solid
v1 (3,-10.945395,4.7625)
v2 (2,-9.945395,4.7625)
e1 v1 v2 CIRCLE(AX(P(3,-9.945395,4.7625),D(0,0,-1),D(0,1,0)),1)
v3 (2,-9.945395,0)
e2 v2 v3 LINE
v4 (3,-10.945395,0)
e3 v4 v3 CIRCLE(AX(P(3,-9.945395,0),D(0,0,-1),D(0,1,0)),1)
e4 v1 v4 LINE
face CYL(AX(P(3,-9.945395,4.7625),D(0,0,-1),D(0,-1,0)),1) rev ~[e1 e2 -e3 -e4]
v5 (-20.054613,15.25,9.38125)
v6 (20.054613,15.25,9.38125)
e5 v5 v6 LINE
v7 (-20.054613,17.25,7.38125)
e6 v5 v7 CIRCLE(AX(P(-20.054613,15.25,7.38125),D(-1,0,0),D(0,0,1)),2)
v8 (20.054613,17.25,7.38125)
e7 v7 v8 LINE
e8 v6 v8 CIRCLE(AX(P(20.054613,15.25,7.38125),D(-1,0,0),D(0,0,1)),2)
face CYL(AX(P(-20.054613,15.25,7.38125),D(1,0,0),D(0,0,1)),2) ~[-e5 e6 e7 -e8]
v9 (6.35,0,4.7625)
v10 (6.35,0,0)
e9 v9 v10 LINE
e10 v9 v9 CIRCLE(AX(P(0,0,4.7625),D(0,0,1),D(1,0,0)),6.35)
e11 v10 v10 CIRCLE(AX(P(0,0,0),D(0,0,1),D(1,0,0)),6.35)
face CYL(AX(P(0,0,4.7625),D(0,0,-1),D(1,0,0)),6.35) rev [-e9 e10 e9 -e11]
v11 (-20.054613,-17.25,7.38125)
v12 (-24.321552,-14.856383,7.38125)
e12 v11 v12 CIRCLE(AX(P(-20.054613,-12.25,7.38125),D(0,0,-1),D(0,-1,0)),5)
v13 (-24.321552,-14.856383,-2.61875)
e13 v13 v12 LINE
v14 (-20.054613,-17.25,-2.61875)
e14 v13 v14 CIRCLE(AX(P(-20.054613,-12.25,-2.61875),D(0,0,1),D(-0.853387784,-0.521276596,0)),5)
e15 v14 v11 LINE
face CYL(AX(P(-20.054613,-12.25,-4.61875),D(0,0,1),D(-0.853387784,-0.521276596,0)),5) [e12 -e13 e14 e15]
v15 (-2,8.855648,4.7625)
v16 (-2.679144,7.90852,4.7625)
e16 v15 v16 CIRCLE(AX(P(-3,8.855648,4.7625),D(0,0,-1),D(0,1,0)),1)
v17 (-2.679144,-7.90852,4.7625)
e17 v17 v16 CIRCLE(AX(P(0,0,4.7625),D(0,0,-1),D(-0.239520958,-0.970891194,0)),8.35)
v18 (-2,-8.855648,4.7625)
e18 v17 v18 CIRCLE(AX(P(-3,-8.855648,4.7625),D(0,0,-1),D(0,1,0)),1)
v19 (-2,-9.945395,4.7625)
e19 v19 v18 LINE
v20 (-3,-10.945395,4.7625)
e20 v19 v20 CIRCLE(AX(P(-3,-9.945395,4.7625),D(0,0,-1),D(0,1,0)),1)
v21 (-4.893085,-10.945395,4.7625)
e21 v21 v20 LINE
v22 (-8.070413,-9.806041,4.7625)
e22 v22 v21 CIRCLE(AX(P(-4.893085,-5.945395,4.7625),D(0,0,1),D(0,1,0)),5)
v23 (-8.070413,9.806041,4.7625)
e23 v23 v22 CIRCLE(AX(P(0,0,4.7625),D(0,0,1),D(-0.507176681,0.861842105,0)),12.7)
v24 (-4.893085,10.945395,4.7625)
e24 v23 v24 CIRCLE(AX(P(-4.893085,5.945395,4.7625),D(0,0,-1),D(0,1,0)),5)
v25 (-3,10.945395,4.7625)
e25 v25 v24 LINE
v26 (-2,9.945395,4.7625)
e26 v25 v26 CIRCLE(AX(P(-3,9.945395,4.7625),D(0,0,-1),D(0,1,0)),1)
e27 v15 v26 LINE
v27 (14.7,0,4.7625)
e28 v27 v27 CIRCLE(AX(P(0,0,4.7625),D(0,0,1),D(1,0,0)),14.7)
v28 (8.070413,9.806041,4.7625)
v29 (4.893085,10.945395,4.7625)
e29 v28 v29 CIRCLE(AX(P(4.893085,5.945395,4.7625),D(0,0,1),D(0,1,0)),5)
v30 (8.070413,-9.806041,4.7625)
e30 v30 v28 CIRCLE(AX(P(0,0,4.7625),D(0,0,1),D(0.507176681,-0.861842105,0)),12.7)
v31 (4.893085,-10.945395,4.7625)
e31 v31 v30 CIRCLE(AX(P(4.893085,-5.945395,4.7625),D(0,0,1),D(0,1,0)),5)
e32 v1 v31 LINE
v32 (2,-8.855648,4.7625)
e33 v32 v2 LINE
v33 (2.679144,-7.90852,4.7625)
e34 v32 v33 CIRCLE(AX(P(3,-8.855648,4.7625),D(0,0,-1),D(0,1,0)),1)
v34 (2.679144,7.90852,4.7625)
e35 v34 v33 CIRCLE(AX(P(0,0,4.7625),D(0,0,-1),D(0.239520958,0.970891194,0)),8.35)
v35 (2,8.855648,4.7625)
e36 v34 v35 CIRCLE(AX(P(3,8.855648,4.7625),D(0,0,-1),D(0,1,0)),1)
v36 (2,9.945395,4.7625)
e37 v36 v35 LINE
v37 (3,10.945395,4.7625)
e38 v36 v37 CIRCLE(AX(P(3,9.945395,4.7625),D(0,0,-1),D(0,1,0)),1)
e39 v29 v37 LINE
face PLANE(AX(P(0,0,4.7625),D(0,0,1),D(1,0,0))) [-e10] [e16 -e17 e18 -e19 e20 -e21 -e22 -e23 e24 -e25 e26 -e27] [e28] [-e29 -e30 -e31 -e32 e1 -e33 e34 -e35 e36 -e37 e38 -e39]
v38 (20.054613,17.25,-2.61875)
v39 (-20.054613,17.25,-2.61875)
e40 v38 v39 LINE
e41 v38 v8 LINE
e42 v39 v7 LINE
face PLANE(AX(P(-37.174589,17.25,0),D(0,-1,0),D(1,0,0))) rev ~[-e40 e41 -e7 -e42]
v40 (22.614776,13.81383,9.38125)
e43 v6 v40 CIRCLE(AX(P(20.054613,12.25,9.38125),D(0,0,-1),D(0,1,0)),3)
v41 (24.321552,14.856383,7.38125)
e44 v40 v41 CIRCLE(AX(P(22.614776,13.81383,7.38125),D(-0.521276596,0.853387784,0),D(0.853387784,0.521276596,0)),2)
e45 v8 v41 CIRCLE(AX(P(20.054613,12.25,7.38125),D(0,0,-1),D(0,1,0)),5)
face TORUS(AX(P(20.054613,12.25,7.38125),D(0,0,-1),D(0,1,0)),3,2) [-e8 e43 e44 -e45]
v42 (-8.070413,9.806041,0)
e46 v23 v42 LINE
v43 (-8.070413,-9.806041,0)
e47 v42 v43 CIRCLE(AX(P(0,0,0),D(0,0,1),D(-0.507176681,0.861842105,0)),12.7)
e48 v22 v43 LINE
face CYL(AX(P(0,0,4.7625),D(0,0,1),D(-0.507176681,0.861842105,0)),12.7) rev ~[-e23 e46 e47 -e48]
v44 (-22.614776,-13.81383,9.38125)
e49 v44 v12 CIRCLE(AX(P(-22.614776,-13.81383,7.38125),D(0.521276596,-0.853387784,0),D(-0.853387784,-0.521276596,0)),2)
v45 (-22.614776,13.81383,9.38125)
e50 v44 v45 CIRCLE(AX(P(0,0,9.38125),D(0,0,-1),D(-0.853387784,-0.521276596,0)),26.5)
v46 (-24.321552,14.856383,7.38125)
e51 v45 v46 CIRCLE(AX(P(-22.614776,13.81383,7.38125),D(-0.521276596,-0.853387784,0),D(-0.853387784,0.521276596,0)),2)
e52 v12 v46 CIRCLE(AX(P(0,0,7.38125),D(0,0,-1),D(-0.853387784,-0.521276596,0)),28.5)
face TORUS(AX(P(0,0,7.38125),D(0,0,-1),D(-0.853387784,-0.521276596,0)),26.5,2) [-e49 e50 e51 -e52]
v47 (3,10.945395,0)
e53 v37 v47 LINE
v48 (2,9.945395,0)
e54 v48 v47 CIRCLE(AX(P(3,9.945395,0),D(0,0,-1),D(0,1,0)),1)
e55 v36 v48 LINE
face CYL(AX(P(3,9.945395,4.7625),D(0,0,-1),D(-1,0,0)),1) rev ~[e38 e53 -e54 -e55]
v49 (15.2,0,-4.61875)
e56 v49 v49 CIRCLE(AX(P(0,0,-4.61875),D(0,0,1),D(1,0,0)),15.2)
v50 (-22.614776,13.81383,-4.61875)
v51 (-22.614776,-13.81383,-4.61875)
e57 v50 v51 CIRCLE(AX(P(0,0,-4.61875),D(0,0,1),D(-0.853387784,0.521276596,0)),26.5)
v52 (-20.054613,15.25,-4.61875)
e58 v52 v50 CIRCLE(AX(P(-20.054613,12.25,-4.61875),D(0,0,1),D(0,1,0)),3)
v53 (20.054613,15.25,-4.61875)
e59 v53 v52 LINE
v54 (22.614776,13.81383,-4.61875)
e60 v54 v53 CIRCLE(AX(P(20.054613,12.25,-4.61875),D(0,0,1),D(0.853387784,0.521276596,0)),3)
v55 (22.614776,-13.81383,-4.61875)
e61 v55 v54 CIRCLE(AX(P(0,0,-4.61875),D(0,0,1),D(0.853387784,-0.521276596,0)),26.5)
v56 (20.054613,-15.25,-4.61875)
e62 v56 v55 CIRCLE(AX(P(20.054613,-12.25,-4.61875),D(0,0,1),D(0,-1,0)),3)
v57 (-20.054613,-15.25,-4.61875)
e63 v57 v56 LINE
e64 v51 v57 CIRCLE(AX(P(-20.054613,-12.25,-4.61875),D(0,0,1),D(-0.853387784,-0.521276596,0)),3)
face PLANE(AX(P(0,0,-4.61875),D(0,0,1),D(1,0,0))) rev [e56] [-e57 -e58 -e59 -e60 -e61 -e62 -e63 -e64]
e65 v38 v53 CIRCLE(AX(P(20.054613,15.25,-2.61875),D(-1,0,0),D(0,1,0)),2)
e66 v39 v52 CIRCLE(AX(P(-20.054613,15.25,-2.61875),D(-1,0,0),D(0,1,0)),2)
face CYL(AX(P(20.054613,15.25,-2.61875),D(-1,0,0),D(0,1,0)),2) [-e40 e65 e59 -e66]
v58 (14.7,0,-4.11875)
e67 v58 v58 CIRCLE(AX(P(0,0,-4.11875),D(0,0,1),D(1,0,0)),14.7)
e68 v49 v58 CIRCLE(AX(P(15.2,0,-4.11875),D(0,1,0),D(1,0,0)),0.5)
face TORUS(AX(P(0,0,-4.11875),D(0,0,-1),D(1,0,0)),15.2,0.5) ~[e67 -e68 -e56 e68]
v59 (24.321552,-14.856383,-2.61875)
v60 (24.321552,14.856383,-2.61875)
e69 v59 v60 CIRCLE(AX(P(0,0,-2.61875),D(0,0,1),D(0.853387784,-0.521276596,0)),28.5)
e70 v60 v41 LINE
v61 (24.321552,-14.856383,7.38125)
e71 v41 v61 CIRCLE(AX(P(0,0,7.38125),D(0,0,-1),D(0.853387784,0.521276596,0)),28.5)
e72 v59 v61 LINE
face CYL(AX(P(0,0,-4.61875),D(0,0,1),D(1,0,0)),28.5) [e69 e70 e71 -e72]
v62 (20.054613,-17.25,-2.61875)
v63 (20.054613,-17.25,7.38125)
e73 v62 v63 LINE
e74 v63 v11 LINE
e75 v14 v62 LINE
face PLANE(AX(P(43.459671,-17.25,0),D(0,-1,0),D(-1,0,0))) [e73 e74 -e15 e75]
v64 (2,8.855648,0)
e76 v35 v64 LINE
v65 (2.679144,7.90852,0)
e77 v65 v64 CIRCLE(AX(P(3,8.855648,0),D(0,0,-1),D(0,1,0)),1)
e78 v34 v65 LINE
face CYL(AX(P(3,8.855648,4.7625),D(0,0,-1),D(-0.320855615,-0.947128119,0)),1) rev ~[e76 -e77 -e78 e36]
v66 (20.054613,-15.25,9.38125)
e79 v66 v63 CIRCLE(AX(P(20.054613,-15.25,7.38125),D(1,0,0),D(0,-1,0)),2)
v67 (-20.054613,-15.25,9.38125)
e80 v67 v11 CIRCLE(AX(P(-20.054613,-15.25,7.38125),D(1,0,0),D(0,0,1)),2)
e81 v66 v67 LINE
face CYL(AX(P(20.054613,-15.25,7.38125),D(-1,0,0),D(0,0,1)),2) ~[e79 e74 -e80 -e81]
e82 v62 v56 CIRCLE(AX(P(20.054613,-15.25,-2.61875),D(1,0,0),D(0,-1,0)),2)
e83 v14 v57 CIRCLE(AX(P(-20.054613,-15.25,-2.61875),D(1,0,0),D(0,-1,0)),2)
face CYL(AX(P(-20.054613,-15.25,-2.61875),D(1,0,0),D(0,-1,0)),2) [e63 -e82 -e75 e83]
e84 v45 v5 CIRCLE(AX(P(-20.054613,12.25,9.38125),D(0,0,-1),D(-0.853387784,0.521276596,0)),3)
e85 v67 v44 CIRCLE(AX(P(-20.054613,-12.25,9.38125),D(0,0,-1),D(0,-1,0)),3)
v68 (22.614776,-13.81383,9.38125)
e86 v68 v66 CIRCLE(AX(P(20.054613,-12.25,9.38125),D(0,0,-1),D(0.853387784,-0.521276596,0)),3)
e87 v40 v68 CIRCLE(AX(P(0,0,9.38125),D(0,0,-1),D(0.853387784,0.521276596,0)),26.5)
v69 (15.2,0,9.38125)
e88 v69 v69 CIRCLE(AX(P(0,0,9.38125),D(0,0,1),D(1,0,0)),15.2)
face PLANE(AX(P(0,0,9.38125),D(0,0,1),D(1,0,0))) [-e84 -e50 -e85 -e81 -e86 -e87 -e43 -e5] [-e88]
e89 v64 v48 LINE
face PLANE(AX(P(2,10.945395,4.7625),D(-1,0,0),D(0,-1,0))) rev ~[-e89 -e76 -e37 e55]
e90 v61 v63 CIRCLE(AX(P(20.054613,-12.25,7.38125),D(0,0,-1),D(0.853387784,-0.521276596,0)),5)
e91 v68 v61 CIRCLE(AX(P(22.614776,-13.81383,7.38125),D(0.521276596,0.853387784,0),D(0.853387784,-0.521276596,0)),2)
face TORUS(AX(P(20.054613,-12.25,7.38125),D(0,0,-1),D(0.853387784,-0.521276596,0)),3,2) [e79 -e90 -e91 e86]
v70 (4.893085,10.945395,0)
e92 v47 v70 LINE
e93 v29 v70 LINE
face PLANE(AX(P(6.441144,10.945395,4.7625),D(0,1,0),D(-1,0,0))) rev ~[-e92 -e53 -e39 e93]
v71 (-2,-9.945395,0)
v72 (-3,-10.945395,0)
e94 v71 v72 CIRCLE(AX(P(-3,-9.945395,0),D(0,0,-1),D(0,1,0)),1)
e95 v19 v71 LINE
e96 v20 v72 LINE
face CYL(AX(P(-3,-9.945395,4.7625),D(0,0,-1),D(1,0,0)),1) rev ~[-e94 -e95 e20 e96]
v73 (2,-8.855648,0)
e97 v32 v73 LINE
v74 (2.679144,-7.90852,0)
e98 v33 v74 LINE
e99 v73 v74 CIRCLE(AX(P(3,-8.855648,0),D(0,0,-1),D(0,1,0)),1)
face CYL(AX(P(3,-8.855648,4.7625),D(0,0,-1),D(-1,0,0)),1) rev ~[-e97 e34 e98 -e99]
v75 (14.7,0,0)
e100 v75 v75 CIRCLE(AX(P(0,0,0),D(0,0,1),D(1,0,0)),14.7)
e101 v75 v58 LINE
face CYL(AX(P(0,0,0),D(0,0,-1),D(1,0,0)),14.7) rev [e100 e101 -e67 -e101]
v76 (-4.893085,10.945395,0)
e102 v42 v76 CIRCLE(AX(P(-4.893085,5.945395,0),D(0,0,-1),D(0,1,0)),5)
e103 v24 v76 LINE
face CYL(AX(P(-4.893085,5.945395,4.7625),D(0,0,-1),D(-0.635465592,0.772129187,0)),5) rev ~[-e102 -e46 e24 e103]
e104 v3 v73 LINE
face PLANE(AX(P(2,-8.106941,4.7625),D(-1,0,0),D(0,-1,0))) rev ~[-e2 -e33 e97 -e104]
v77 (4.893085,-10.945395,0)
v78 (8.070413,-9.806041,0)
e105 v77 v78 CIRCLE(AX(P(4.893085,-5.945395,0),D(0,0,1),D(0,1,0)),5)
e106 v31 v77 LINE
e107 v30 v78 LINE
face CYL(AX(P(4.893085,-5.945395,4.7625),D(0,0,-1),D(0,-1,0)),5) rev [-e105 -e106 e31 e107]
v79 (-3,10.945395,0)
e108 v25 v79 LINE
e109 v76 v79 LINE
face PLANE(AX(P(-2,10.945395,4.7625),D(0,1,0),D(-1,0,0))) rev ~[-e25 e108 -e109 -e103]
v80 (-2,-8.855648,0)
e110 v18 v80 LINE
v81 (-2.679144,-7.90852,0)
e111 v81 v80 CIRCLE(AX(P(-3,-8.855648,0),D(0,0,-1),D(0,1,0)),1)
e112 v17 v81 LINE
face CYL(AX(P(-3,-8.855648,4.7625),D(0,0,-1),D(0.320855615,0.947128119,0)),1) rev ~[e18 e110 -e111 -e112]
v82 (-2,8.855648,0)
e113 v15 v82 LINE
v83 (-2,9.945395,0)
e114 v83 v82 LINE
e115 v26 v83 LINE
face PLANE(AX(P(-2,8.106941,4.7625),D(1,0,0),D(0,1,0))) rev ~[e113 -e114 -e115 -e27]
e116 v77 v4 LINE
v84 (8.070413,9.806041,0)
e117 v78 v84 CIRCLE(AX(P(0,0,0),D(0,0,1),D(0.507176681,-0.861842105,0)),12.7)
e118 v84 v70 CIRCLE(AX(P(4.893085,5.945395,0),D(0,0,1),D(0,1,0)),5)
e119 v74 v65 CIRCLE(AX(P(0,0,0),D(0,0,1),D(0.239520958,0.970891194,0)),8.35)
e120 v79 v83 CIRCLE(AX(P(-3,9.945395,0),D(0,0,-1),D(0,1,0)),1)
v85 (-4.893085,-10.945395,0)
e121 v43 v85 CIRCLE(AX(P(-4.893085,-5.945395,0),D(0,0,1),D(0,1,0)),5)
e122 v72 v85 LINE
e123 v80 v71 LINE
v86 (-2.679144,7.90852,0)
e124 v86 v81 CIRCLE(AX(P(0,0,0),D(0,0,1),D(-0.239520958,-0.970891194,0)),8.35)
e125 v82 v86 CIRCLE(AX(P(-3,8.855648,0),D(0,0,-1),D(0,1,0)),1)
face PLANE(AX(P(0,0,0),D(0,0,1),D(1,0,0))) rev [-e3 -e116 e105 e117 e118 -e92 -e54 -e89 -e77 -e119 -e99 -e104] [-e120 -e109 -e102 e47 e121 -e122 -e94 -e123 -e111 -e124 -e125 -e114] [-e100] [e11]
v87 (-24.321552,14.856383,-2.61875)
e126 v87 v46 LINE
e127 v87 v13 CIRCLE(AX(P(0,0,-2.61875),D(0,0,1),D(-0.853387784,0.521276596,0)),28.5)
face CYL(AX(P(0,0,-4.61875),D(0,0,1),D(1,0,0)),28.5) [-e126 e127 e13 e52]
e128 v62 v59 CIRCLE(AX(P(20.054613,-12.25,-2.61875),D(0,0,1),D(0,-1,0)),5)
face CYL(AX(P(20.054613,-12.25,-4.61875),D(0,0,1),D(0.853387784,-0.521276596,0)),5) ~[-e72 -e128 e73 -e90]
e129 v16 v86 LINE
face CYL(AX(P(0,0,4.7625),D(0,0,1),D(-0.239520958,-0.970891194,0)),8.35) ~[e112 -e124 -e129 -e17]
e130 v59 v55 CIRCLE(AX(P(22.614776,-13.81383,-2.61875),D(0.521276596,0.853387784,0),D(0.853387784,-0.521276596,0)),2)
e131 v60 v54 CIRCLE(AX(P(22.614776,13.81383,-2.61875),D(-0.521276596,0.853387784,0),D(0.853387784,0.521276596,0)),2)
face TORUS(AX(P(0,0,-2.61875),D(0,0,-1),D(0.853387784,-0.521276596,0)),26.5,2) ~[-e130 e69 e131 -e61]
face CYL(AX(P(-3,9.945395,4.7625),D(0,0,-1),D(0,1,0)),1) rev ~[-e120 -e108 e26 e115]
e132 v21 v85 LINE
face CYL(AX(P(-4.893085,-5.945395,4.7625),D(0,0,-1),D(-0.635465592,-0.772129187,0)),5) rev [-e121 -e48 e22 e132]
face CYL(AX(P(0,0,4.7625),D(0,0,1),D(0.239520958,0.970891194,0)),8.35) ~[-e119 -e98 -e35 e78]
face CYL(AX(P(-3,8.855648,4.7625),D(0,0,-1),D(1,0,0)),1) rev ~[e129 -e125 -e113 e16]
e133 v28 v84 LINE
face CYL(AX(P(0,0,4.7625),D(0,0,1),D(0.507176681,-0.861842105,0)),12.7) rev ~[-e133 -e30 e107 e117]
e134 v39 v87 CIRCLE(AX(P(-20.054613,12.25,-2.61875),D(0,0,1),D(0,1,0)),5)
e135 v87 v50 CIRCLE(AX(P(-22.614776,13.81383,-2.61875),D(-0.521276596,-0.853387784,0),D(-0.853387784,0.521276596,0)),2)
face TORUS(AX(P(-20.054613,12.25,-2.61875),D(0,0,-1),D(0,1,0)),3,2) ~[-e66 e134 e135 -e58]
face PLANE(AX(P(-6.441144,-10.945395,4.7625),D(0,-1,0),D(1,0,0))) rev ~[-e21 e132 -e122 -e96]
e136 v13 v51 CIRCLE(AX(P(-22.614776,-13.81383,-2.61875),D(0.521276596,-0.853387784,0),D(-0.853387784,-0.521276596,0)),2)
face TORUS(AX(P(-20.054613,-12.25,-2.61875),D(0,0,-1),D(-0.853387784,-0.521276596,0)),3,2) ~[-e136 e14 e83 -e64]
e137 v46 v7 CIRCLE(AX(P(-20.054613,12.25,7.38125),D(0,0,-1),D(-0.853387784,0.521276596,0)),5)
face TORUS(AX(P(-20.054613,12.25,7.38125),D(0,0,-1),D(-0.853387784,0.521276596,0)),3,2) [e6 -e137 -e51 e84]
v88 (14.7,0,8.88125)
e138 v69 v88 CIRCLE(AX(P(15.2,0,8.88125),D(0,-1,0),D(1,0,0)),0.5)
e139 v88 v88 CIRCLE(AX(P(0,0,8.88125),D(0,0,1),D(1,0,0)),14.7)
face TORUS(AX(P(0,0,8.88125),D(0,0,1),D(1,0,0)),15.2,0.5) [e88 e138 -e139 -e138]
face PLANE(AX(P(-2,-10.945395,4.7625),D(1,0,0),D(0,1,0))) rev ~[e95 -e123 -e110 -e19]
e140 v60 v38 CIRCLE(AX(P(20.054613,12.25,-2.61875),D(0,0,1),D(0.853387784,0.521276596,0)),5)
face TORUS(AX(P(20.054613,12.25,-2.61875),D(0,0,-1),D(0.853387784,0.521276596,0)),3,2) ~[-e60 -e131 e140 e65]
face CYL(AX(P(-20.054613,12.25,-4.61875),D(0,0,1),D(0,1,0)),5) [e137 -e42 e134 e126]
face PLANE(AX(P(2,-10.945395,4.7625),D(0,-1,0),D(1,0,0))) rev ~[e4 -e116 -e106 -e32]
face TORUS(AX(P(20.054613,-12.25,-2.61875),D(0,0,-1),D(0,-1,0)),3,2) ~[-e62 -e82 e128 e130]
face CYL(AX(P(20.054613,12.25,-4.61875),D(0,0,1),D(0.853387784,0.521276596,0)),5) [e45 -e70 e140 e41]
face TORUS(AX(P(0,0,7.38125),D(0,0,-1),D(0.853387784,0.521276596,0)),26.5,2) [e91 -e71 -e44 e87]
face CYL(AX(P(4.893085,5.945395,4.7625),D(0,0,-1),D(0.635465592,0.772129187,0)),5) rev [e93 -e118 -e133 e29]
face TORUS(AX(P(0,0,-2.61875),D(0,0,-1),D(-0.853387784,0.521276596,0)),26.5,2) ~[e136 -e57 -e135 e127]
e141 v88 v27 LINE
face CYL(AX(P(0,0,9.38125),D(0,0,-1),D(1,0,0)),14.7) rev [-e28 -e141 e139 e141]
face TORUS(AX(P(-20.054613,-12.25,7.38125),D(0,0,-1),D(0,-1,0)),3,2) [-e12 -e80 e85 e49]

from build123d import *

# Parameters (mm, degrees)
F3_DEPTH      = 12.5
F5_DEPTH      = 25
F6_R          = 5
F6_2_R        = 5
F7_F1_R       = 1
F7_F2_R       = 1
F7_F3_R       = 1
F7_F4_R       = 1
F7_F5_R       = 1
F7_F6_R       = 1
F7_F7_R       = 1
F7_F8_R       = 1
F7_2_T1_DEPTH = 4.7461491674
F7_2_T3_DEPTH = 6.508829184
F8_R          = 5
F9_R          = 2
F10_R         = 1
F11_R         = 0.5
F12_R         = 0.99999
F13_R         = 0.5


# Not quite as in the source:
# - a fillet or chamfer that OpenCascade refuses, or shapes differently, is made with other operations: its cross-section is extruded or revolved along the edge and cut away or added
# - a fillet or chamfer is up to 0.001 mm smaller than in the source, because OpenCascade refuses the exact size


with BuildPart() as f1:
    # F0 (on Front) → F1 (revolve)
    with BuildSketch(Plane.XZ):
        Polygon((6.35, 4.7625), (6.35, 0), (12.7, 0), (14.7, 0), (14.7, -1.5), (14.7, -4.61875), (24.5, -4.61875), (28.5, -4.61875), (28.5, 2.38125), (28.5, 9.38125), (24.5, 9.38125), (14.7, 9.38125), (14.7, 6.2625), (14.7, 4.7625), (12.7, 4.7625), align=None)
    revolve(axis=Axis((0, 0, 2.38125), (0, 0, 1)))

    # F2 (on Top) → F3 (cut, symmetric)
    with BuildSketch(Plane.XY):
        Polygon((43.4596711934, -17.25), (17.25, -17.25), (-17.25, -17.25), (-37.0058989125, -17.25), (-37.0058989125, -42.7323755096), (43.4596711934, -42.7323755096), align=None)
        Polygon((-17.25, 17.25), (17.25, 17.25), (41.6040706777, 17.25), (41.6040706777, 42.1191624585), (-37.1745894389, 42.1191624585), (-37.1745894389, 17.25), align=None)
    extrude(amount=F3_DEPTH, both=True, mode=Mode.SUBTRACT)


with BuildPart() as f1b:
    # F0 (on Front) → F1, piece 2 (revolve)
    with BuildSketch(Plane.XZ):
        with BuildLine():
            Line((13.7, -0.7476008326), (12.7, -0.7476008326))
            Line((12.7, -0.7476008326), (0, -0.7476008326))
            Line((0, -0.7476008326), (0, -3.9319758326))
            ThreePointArc((0, -3.9319758326), (4.3942490964, -4.3344919718), (8.6518969432, -5.49375))
            Line((8.6518969432, -5.49375), (10.5085438117, -5.49375))
            Line((10.5085438117, -5.49375), (13.7, -5.49375))
            Line((13.7, -5.49375), (13.7, -1.5))
            Line((13.7, -1.5), (13.7, -0.7476008326))
        make_face()
    revolve(axis=Axis((0, 0, 2.38125), (0, 0, 1)))


with BuildPart() as f1c:
    # F0 (on Front) → F1, piece 3 (revolve)
    with BuildSketch(Plane.XZ):
        with BuildLine():
            Line((0, 8.6944758326), (0, 6.2577016652))
            Line((0, 6.2577016652), (0, 5.5101008326))
            Line((0, 5.5101008326), (12.7, 5.5101008326))
            Line((12.7, 5.5101008326), (13.7, 5.5101008326))
            Line((13.7, 5.5101008326), (13.7, 6.2625))
            Line((13.7, 6.2625), (13.7, 10.25625))
            Line((13.7, 10.25625), (10.5085438117, 10.25625))
            Line((10.5085438117, 10.25625), (8.6518969432, 10.25625))
            ThreePointArc((8.6518969432, 10.25625), (4.3942490964, 9.0969919718), (0, 8.6944758326))
        make_face()
    revolve(axis=Axis((0, 0, 2.38125), (0, 0, 1)))

    # F10
    f10_edges = [f1c.edges().sort_by_distance(p)[0] for p in [
        (-13.7, 0, 10.25625),
    ]]
    fillet(f10_edges, radius=F10_R)


with BuildPart() as f5_tool:
    # F4 (on face) → F5 (new body)
    with BuildSketch(Plane.XY.offset(4.7625)):
        with BuildLine():
            ThreePointArc((-6.4411438468, 10.9453947368), (-12.7, 0), (-6.4411438468, -10.9453947368))
            Line((-6.4411438468, -10.9453947368), (-2, -10.9453947368))
            Line((-2, -10.9453947368), (-2, -8.1069414701))
            ThreePointArc((-2, -8.1069414701), (-8.35, 0), (-2, 8.1069414701))
            Line((-2, 8.1069414701), (-2, 10.9453947368))
            Line((-2, 10.9453947368), (-6.4411438468, 10.9453947368))
        make_face()
        with BuildLine():
            Line((2, -10.9453947368), (6.4411438468, -10.9453947368))
            ThreePointArc((6.4411438468, -10.9453947368), (12.7, 0), (6.4411438468, 10.9453947368))
            Line((6.4411438468, 10.9453947368), (2, 10.9453947368))
            Line((2, 10.9453947368), (2, 8.1069414701))
            ThreePointArc((2, 8.1069414701), (8.35, 0), (2, -8.1069414701))
            Line((2, -8.1069414701), (2, -10.9453947368))
        make_face()
    extrude(amount=-F5_DEPTH)


with BuildPart() as f1_1:
    add(f1.part)

    # F5: cut by f5_tool
    add(f5_tool.part, mode=Mode.SUBTRACT)

    # F6
    f6_edges = [f1_1.edges().sort_by_distance(p)[0] for p in [
        (6.441144, 10.945395, 2.38125),
        (-6.441144, 10.945395, 2.38125),
        (-6.441144, -10.945395, 2.38125),
        (6.441144, -10.945395, 2.38125),
    ]]
    fillet(f6_edges, radius=F6_R)

    # F7: fillet of radius 1 on 8 edges, made by hand

    # F7_f1
    f7_f1_edges = [f1_1.edges().sort_by_distance(p)[0] for p in [
        (-2, 10.9453947368, 2.38125),
    ]]
    fillet(f7_f1_edges, radius=F7_F1_R)

    # F7_f2
    f7_f2_edges = [f1_1.edges().sort_by_distance(p)[0] for p in [
        (-2, 8.1069414701, 2.38125),
    ]]
    fillet(f7_f2_edges, radius=F7_F2_R)

    # F7_f3
    f7_f3_edges = [f1_1.edges().sort_by_distance(p)[0] for p in [
        (-2, -8.1069414701, 2.38125),
    ]]
    fillet(f7_f3_edges, radius=F7_F3_R)

    # F7_f4
    f7_f4_edges = [f1_1.edges().sort_by_distance(p)[0] for p in [
        (-2, -10.9453947368, 2.38125),
    ]]
    fillet(f7_f4_edges, radius=F7_F4_R)

    # F7_f5
    f7_f5_edges = [f1_1.edges().sort_by_distance(p)[0] for p in [
        (2, -10.9453947368, 2.38125),
    ]]
    fillet(f7_f5_edges, radius=F7_F5_R)

    # F7_f6
    f7_f6_edges = [f1_1.edges().sort_by_distance(p)[0] for p in [
        (2, -8.1069414701, 2.38125),
    ]]
    fillet(f7_f6_edges, radius=F7_F6_R)

    # F7_f7
    f7_f7_edges = [f1_1.edges().sort_by_distance(p)[0] for p in [
        (2, 8.1069414701, 2.38125),
    ]]
    fillet(f7_f7_edges, radius=F7_F7_R)

    # F7_f8
    f7_f8_edges = [f1_1.edges().sort_by_distance(p)[0] for p in [
        (2, 10.9453947368, 2.38125),
    ]]
    fillet(f7_f8_edges, radius=F7_F8_R)

    # F8
    f8_edges = [f1_1.edges().sort_by_distance(p)[0] for p in [
        (-22.686725, -17.25, 2.38125),
        (22.686725, -17.25, 2.38125),
        (-22.686725, 17.25, 2.38125),
        (22.686725, 17.25, 2.38125),
    ]]
    fillet(f8_edges, radius=F8_R)

    # F9
    f9_edges = [f1_1.edges().sort_by_distance(p)[0] for p in [
        (0, 17.25, 9.38125),
        (0, 17.25, -4.61875),
    ]]
    fillet(f9_edges, radius=F9_R)

    # F11
    f11_edges = [f1_1.edges().sort_by_distance(p)[0] for p in [
        (-14.7, 0, 9.38125),
    ]]
    fillet(f11_edges, radius=F11_R)

    # F13
    f13_edges = [f1_1.edges().sort_by_distance(p)[0] for p in [
        (-14.7, 0, -4.61875),
    ]]
    fillet(f13_edges, radius=F13_R)


with BuildPart() as f1b_1:
    add(f1b.part)

    # F5: cut by f5_tool
    add(f5_tool.part, mode=Mode.SUBTRACT)

    # F6#2
    f6_2_edges = [f1b_1.edges().sort_by_distance(p)[0] for p in [
        (6.441144, 10.945395, -3.120675),
        (-6.441144, 10.945395, -3.120675),
        (-6.441144, -10.945395, -3.120675),
        (6.441144, -10.945395, -3.120675),
    ]]
    fillet(f6_2_edges, radius=F6_2_R)

    # F7#2: fillet of radius 1 on 8 edges, made by hand

    # F7_2_s2 → F7_2_t1 (join)
    with BuildSketch(Plane.XY.offset(-5.49375)):
        with BuildLine():
            ThreePointArc((-3, 10.9453947368), (-2.2928932188, 10.652501518), (-2, 9.9453947368))
            Line((-2, 9.9453947368), (-1.98, 9.9453947368))
            Line((-1.98, 9.9453947368), (-1.98, 10.9653947368))
            Line((-1.98, 10.9653947368), (-3, 10.9653947368))
            Line((-3, 10.9653947368), (-3, 10.9453947368))
        make_face()
        with BuildLine():
            ThreePointArc((3, -10.9453947368), (2.2928932188, -10.652501518), (2, -9.9453947368))
            Line((2, -9.9453947368), (1.98, -9.9453947368))
            Line((1.98, -9.9453947368), (1.98, -10.9653947368))
            Line((1.98, -10.9653947368), (3, -10.9653947368))
            Line((3, -10.9653947368), (3, -10.9453947368))
        make_face()
        with BuildLine():
            ThreePointArc((2, 9.9453947368), (2.2928932188, 10.652501518), (3, 10.9453947368))
            Line((3, 10.9453947368), (3, 10.9653947368))
            Line((3, 10.9653947368), (1.98, 10.9653947368))
            Line((1.98, 10.9653947368), (1.98, 9.9453947368))
            Line((1.98, 9.9453947368), (2, 9.9453947368))
        make_face()
        with BuildLine():
            ThreePointArc((-2, -9.9453947368), (-2.2928932188, -10.652501518), (-3, -10.9453947368))
            Line((-3, -10.9453947368), (-3, -10.9653947368))
            Line((-3, -10.9653947368), (-1.98, -10.9653947368))
            Line((-1.98, -10.9653947368), (-1.98, -9.9453947368))
            Line((-1.98, -9.9453947368), (-2, -9.9453947368))
        make_face()
    extrude(amount=F7_2_T1_DEPTH)

    # F7_2_s4 → F7_2_t3 (join)
    with BuildSketch(Plane.XY.offset(-7.2564300165)):
        with BuildLine():
            ThreePointArc((2.679144385, 7.908519796), (2.1873329049, 8.2729196832), (2, 8.8556479153))
            Line((2, 8.8556479153), (1.98, 8.8556479153))
            Line((1.98, 8.8556479153), (1.98, 8.1069414701))
            Line((1.98, 8.1069414701), (1.9952095808, 8.0875236462))
            ThreePointArc((1.9952095808, 8.0875236462), (2.3360659907, 7.9957298408), (2.6727272727, 7.8895772336))
            Line((2.6727272727, 7.8895772336), (2.679144385, 7.908519796))
        make_face()
        with BuildLine():
            ThreePointArc((-2, 8.8556479153), (-2.1873329049, 8.2729196832), (-2.679144385, 7.908519796))
            Line((-2.679144385, 7.908519796), (-2.6727272727, 7.8895772336))
            ThreePointArc((-2.6727272727, 7.8895772336), (-2.3360659907, 7.9957298408), (-1.9952095808, 8.0875236462))
            Line((-1.9952095808, 8.0875236462), (-1.98, 8.1069414701))
            Line((-1.98, 8.1069414701), (-1.98, 8.8556479153))
            Line((-1.98, 8.8556479153), (-2, 8.8556479153))
        make_face()
        with BuildLine():
            ThreePointArc((2, -8.8556479153), (2.1873329049, -8.2729196832), (2.679144385, -7.908519796))
            Line((2.679144385, -7.908519796), (2.6727272727, -7.8895772336))
            ThreePointArc((2.6727272727, -7.8895772336), (2.3360659907, -7.9957298408), (1.9952095808, -8.0875236462))
            Line((1.9952095808, -8.0875236462), (1.98, -8.1069414701))
            Line((1.98, -8.1069414701), (1.98, -8.8556479153))
            Line((1.98, -8.8556479153), (2, -8.8556479153))
        make_face()
        with BuildLine():
            ThreePointArc((-2.679144385, -7.908519796), (-2.1873329049, -8.2729196832), (-2, -8.8556479153))
            Line((-2, -8.8556479153), (-1.98, -8.8556479153))
            Line((-1.98, -8.8556479153), (-1.98, -8.1069414701))
            Line((-1.98, -8.1069414701), (-1.9952095808, -8.0875236462))
            ThreePointArc((-1.9952095808, -8.0875236462), (-2.3360659907, -7.9957298408), (-2.6727272727, -7.8895772336))
            Line((-2.6727272727, -7.8895772336), (-2.679144385, -7.908519796))
        make_face()
    extrude(amount=F7_2_T3_DEPTH)

    # F12 (radius 1 in the source; OpenCascade refuses exactly that, so slightly less here)
    f12_edges = [f1b_1.edges().sort_by_distance(p)[0] for p in [
        (-13.7, 0, -5.49375),
    ]]
    fillet(f12_edges, radius=F12_R)


solid = f1_1.part
